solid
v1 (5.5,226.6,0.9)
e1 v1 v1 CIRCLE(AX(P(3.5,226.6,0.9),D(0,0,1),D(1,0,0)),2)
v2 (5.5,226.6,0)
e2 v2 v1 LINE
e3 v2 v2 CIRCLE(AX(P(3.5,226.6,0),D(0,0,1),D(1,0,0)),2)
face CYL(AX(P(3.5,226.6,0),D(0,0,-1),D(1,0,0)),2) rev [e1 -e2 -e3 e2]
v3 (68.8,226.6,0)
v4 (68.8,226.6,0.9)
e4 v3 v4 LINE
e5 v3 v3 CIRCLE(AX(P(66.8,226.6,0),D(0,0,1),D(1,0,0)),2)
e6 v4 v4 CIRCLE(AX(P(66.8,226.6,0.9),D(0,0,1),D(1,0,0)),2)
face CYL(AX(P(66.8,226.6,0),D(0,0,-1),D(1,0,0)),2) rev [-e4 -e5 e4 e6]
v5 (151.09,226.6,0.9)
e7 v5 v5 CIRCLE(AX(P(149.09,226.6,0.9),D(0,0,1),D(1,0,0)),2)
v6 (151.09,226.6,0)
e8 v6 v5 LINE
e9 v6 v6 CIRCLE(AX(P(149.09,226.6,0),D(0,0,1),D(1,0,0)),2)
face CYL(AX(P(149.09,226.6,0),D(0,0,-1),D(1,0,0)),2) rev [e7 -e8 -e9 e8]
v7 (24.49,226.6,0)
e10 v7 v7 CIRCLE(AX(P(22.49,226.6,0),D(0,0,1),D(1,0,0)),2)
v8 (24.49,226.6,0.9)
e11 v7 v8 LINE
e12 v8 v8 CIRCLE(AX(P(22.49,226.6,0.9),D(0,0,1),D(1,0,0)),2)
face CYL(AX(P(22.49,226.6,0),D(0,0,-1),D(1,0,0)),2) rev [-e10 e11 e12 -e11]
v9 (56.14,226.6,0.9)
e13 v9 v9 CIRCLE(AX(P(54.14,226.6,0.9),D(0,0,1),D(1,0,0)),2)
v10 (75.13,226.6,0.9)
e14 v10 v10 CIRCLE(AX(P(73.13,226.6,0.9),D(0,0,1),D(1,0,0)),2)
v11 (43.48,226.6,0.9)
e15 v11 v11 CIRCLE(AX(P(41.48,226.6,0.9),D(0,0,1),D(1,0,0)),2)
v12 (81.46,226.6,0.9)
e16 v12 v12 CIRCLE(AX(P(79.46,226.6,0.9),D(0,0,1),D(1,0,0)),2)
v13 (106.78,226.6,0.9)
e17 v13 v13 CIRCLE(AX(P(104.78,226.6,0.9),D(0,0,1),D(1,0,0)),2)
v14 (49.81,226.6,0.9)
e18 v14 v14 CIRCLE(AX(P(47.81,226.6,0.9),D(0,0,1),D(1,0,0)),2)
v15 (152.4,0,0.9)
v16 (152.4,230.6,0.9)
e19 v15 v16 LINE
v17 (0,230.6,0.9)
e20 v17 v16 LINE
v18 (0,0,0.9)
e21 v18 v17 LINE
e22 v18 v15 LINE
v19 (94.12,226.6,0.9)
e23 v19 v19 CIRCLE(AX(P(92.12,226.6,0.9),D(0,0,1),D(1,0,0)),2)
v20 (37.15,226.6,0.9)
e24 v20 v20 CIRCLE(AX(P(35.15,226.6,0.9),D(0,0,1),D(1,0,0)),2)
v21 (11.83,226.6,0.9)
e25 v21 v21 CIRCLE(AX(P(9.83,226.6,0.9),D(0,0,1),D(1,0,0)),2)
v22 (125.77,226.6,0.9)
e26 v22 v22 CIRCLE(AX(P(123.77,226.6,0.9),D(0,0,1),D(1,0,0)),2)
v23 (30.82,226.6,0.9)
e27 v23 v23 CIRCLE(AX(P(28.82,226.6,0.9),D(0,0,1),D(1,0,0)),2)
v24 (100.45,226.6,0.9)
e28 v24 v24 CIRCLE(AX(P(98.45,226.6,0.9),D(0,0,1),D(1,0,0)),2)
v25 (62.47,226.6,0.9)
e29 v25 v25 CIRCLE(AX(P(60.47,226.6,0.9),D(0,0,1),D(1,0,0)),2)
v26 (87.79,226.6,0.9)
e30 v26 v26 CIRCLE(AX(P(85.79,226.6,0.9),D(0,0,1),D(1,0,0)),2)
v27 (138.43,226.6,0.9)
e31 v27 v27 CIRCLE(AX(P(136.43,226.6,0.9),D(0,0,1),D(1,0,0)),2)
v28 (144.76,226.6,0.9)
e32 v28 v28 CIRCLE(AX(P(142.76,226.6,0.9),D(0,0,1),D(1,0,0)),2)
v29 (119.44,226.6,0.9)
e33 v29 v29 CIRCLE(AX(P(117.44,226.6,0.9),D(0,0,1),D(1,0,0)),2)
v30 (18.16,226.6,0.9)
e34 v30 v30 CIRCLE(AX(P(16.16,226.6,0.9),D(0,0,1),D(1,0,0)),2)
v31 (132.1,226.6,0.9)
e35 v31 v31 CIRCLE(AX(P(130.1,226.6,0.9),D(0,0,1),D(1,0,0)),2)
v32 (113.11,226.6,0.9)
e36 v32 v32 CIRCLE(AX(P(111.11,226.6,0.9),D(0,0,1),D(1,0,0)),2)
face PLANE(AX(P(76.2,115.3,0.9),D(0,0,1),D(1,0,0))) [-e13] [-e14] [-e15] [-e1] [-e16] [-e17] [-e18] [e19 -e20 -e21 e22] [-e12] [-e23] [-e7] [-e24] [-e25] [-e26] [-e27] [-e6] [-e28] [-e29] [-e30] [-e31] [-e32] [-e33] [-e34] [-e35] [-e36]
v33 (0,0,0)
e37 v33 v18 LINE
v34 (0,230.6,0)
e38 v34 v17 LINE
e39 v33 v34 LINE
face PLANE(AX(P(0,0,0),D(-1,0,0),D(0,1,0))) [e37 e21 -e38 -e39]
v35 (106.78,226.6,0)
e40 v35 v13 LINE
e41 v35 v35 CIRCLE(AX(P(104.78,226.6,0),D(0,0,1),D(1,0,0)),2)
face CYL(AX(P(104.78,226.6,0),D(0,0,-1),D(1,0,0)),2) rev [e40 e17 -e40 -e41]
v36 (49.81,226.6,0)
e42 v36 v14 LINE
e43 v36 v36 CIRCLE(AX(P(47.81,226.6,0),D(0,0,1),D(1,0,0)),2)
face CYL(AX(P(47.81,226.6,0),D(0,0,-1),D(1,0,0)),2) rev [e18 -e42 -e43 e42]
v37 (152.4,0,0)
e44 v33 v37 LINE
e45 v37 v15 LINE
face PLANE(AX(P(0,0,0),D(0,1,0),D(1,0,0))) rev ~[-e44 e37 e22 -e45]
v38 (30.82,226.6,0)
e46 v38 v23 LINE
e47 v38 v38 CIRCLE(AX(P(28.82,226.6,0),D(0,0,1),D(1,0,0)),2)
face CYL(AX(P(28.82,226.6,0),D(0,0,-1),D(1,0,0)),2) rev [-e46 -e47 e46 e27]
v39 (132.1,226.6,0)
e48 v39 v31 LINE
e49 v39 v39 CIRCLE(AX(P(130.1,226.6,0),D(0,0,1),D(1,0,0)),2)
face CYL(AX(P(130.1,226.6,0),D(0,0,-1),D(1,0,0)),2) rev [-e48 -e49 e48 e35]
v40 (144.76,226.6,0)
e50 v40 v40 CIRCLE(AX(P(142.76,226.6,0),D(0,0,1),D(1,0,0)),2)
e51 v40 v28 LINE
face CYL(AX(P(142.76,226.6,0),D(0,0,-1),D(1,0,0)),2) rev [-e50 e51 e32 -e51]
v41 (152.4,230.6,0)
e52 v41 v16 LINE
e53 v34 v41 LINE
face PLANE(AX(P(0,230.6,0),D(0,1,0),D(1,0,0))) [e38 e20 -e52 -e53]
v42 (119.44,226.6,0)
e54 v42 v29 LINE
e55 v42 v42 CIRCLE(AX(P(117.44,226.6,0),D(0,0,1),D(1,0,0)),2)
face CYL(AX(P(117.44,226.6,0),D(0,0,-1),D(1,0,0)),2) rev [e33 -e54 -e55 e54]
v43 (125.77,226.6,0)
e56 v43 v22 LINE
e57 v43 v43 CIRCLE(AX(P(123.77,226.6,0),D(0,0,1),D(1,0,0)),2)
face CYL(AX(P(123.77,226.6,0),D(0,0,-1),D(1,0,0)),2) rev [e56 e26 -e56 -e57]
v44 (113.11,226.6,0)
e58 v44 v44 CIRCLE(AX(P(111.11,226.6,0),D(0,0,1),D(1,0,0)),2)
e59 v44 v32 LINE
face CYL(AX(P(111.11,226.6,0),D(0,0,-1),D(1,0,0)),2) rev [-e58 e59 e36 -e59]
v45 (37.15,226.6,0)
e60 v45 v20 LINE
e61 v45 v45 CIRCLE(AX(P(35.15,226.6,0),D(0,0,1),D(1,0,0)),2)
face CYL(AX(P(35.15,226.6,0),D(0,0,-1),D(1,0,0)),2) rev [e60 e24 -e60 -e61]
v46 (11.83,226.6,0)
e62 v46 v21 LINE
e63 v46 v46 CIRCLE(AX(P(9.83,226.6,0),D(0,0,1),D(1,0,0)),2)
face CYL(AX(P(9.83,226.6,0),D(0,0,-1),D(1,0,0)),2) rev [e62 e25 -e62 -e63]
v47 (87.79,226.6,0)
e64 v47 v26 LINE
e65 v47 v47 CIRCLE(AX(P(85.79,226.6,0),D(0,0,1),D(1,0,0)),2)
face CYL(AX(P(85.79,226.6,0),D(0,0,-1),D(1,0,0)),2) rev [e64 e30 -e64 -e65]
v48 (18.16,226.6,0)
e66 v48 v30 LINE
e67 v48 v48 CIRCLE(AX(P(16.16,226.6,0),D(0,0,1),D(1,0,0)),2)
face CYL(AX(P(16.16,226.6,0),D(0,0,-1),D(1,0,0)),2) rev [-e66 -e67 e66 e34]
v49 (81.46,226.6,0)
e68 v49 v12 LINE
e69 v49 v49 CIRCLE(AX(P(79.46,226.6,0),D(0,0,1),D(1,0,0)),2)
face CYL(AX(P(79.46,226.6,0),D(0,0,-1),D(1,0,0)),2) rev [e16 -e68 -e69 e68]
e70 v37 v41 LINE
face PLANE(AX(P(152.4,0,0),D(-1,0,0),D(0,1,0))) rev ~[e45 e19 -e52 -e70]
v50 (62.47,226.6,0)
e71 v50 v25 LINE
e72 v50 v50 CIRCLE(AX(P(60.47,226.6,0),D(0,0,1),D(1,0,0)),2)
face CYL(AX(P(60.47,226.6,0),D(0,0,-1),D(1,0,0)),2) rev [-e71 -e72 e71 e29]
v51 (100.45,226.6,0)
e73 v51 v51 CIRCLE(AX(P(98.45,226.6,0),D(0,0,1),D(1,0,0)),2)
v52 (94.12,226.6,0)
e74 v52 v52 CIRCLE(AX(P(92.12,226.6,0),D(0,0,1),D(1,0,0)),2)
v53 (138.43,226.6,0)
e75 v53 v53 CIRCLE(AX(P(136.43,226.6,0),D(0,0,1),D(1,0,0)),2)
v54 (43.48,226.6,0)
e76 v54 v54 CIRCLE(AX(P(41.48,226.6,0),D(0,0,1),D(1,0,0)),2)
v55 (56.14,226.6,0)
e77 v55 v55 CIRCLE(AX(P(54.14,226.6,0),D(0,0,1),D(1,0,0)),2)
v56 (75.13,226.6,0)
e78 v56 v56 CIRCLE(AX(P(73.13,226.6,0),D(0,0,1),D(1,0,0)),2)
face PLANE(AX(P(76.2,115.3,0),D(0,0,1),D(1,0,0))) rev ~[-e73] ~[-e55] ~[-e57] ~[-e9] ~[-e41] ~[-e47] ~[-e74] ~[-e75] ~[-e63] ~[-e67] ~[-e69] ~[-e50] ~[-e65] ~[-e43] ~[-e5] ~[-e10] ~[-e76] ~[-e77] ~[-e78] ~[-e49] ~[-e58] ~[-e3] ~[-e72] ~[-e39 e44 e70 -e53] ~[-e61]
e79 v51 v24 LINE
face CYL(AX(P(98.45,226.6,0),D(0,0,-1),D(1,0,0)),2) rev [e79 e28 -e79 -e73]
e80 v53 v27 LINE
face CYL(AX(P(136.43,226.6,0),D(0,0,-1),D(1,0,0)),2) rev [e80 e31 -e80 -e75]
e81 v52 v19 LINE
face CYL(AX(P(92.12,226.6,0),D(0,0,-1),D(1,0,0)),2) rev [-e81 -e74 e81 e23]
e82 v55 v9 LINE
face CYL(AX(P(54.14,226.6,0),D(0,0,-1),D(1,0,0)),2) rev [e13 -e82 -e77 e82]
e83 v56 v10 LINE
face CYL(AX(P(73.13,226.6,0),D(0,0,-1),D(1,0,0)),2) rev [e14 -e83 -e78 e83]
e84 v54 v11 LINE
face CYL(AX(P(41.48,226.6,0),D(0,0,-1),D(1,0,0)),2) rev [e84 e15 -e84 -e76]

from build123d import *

# Parameters (mm, degrees)
F0_W     = 152.4
F0_H     = 230.6
F0_R     = 2
F1_DEPTH = 0.9


# Not quite as in the source:
# - a feature names something its author has since deleted; it is built from what else it names


with BuildPart() as f1:
    # F0 (on Top) → F1 (new body)
    with BuildSketch(Plane.XY):
        with Locations((76.2, 115.3)):
            Rectangle(F0_W, F0_H)
        with Locations((3.5, 226.6)):
            Circle(F0_R, mode=Mode.SUBTRACT)
        with Locations((9.83, 226.6)):
            Circle(F0_R, mode=Mode.SUBTRACT)
        with Locations((16.16, 226.6)):
            Circle(F0_R, mode=Mode.SUBTRACT)
        with Locations((22.49, 226.6)):
            Circle(F0_R, mode=Mode.SUBTRACT)
        with Locations((28.82, 226.6)):
            Circle(F0_R, mode=Mode.SUBTRACT)
        with Locations((35.15, 226.6)):
            Circle(F0_R, mode=Mode.SUBTRACT)
        with Locations((41.48, 226.6)):
            Circle(F0_R, mode=Mode.SUBTRACT)
        with Locations((47.81, 226.6)):
            Circle(F0_R, mode=Mode.SUBTRACT)
        with Locations((54.14, 226.6)):
            Circle(F0_R, mode=Mode.SUBTRACT)
        with Locations((60.47, 226.6)):
            Circle(F0_R, mode=Mode.SUBTRACT)
        with Locations((66.8, 226.6)):
            Circle(F0_R, mode=Mode.SUBTRACT)
        with Locations((73.13, 226.6)):
            Circle(F0_R, mode=Mode.SUBTRACT)
        with Locations((79.46, 226.6)):
            Circle(F0_R, mode=Mode.SUBTRACT)
        with Locations((85.79, 226.6)):
            Circle(F0_R, mode=Mode.SUBTRACT)
        with Locations((92.12, 226.6)):
            Circle(F0_R, mode=Mode.SUBTRACT)
        with Locations((98.45, 226.6)):
            Circle(F0_R, mode=Mode.SUBTRACT)
        with Locations((104.78, 226.6)):
            Circle(F0_R, mode=Mode.SUBTRACT)
        with Locations((111.11, 226.6)):
            Circle(F0_R, mode=Mode.SUBTRACT)
        with Locations((117.44, 226.6)):
            Circle(F0_R, mode=Mode.SUBTRACT)
        with Locations((123.77, 226.6)):
            Circle(F0_R, mode=Mode.SUBTRACT)
        with Locations((130.1, 226.6)):
            Circle(F0_R, mode=Mode.SUBTRACT)
        with Locations((136.43, 226.6)):
            Circle(F0_R, mode=Mode.SUBTRACT)
        with Locations((142.76, 226.6)):
            Circle(F0_R, mode=Mode.SUBTRACT)
        with Locations((149.09, 226.6)):
            Circle(F0_R, mode=Mode.SUBTRACT)
    extrude(amount=F1_DEPTH)


solid = f1.part
